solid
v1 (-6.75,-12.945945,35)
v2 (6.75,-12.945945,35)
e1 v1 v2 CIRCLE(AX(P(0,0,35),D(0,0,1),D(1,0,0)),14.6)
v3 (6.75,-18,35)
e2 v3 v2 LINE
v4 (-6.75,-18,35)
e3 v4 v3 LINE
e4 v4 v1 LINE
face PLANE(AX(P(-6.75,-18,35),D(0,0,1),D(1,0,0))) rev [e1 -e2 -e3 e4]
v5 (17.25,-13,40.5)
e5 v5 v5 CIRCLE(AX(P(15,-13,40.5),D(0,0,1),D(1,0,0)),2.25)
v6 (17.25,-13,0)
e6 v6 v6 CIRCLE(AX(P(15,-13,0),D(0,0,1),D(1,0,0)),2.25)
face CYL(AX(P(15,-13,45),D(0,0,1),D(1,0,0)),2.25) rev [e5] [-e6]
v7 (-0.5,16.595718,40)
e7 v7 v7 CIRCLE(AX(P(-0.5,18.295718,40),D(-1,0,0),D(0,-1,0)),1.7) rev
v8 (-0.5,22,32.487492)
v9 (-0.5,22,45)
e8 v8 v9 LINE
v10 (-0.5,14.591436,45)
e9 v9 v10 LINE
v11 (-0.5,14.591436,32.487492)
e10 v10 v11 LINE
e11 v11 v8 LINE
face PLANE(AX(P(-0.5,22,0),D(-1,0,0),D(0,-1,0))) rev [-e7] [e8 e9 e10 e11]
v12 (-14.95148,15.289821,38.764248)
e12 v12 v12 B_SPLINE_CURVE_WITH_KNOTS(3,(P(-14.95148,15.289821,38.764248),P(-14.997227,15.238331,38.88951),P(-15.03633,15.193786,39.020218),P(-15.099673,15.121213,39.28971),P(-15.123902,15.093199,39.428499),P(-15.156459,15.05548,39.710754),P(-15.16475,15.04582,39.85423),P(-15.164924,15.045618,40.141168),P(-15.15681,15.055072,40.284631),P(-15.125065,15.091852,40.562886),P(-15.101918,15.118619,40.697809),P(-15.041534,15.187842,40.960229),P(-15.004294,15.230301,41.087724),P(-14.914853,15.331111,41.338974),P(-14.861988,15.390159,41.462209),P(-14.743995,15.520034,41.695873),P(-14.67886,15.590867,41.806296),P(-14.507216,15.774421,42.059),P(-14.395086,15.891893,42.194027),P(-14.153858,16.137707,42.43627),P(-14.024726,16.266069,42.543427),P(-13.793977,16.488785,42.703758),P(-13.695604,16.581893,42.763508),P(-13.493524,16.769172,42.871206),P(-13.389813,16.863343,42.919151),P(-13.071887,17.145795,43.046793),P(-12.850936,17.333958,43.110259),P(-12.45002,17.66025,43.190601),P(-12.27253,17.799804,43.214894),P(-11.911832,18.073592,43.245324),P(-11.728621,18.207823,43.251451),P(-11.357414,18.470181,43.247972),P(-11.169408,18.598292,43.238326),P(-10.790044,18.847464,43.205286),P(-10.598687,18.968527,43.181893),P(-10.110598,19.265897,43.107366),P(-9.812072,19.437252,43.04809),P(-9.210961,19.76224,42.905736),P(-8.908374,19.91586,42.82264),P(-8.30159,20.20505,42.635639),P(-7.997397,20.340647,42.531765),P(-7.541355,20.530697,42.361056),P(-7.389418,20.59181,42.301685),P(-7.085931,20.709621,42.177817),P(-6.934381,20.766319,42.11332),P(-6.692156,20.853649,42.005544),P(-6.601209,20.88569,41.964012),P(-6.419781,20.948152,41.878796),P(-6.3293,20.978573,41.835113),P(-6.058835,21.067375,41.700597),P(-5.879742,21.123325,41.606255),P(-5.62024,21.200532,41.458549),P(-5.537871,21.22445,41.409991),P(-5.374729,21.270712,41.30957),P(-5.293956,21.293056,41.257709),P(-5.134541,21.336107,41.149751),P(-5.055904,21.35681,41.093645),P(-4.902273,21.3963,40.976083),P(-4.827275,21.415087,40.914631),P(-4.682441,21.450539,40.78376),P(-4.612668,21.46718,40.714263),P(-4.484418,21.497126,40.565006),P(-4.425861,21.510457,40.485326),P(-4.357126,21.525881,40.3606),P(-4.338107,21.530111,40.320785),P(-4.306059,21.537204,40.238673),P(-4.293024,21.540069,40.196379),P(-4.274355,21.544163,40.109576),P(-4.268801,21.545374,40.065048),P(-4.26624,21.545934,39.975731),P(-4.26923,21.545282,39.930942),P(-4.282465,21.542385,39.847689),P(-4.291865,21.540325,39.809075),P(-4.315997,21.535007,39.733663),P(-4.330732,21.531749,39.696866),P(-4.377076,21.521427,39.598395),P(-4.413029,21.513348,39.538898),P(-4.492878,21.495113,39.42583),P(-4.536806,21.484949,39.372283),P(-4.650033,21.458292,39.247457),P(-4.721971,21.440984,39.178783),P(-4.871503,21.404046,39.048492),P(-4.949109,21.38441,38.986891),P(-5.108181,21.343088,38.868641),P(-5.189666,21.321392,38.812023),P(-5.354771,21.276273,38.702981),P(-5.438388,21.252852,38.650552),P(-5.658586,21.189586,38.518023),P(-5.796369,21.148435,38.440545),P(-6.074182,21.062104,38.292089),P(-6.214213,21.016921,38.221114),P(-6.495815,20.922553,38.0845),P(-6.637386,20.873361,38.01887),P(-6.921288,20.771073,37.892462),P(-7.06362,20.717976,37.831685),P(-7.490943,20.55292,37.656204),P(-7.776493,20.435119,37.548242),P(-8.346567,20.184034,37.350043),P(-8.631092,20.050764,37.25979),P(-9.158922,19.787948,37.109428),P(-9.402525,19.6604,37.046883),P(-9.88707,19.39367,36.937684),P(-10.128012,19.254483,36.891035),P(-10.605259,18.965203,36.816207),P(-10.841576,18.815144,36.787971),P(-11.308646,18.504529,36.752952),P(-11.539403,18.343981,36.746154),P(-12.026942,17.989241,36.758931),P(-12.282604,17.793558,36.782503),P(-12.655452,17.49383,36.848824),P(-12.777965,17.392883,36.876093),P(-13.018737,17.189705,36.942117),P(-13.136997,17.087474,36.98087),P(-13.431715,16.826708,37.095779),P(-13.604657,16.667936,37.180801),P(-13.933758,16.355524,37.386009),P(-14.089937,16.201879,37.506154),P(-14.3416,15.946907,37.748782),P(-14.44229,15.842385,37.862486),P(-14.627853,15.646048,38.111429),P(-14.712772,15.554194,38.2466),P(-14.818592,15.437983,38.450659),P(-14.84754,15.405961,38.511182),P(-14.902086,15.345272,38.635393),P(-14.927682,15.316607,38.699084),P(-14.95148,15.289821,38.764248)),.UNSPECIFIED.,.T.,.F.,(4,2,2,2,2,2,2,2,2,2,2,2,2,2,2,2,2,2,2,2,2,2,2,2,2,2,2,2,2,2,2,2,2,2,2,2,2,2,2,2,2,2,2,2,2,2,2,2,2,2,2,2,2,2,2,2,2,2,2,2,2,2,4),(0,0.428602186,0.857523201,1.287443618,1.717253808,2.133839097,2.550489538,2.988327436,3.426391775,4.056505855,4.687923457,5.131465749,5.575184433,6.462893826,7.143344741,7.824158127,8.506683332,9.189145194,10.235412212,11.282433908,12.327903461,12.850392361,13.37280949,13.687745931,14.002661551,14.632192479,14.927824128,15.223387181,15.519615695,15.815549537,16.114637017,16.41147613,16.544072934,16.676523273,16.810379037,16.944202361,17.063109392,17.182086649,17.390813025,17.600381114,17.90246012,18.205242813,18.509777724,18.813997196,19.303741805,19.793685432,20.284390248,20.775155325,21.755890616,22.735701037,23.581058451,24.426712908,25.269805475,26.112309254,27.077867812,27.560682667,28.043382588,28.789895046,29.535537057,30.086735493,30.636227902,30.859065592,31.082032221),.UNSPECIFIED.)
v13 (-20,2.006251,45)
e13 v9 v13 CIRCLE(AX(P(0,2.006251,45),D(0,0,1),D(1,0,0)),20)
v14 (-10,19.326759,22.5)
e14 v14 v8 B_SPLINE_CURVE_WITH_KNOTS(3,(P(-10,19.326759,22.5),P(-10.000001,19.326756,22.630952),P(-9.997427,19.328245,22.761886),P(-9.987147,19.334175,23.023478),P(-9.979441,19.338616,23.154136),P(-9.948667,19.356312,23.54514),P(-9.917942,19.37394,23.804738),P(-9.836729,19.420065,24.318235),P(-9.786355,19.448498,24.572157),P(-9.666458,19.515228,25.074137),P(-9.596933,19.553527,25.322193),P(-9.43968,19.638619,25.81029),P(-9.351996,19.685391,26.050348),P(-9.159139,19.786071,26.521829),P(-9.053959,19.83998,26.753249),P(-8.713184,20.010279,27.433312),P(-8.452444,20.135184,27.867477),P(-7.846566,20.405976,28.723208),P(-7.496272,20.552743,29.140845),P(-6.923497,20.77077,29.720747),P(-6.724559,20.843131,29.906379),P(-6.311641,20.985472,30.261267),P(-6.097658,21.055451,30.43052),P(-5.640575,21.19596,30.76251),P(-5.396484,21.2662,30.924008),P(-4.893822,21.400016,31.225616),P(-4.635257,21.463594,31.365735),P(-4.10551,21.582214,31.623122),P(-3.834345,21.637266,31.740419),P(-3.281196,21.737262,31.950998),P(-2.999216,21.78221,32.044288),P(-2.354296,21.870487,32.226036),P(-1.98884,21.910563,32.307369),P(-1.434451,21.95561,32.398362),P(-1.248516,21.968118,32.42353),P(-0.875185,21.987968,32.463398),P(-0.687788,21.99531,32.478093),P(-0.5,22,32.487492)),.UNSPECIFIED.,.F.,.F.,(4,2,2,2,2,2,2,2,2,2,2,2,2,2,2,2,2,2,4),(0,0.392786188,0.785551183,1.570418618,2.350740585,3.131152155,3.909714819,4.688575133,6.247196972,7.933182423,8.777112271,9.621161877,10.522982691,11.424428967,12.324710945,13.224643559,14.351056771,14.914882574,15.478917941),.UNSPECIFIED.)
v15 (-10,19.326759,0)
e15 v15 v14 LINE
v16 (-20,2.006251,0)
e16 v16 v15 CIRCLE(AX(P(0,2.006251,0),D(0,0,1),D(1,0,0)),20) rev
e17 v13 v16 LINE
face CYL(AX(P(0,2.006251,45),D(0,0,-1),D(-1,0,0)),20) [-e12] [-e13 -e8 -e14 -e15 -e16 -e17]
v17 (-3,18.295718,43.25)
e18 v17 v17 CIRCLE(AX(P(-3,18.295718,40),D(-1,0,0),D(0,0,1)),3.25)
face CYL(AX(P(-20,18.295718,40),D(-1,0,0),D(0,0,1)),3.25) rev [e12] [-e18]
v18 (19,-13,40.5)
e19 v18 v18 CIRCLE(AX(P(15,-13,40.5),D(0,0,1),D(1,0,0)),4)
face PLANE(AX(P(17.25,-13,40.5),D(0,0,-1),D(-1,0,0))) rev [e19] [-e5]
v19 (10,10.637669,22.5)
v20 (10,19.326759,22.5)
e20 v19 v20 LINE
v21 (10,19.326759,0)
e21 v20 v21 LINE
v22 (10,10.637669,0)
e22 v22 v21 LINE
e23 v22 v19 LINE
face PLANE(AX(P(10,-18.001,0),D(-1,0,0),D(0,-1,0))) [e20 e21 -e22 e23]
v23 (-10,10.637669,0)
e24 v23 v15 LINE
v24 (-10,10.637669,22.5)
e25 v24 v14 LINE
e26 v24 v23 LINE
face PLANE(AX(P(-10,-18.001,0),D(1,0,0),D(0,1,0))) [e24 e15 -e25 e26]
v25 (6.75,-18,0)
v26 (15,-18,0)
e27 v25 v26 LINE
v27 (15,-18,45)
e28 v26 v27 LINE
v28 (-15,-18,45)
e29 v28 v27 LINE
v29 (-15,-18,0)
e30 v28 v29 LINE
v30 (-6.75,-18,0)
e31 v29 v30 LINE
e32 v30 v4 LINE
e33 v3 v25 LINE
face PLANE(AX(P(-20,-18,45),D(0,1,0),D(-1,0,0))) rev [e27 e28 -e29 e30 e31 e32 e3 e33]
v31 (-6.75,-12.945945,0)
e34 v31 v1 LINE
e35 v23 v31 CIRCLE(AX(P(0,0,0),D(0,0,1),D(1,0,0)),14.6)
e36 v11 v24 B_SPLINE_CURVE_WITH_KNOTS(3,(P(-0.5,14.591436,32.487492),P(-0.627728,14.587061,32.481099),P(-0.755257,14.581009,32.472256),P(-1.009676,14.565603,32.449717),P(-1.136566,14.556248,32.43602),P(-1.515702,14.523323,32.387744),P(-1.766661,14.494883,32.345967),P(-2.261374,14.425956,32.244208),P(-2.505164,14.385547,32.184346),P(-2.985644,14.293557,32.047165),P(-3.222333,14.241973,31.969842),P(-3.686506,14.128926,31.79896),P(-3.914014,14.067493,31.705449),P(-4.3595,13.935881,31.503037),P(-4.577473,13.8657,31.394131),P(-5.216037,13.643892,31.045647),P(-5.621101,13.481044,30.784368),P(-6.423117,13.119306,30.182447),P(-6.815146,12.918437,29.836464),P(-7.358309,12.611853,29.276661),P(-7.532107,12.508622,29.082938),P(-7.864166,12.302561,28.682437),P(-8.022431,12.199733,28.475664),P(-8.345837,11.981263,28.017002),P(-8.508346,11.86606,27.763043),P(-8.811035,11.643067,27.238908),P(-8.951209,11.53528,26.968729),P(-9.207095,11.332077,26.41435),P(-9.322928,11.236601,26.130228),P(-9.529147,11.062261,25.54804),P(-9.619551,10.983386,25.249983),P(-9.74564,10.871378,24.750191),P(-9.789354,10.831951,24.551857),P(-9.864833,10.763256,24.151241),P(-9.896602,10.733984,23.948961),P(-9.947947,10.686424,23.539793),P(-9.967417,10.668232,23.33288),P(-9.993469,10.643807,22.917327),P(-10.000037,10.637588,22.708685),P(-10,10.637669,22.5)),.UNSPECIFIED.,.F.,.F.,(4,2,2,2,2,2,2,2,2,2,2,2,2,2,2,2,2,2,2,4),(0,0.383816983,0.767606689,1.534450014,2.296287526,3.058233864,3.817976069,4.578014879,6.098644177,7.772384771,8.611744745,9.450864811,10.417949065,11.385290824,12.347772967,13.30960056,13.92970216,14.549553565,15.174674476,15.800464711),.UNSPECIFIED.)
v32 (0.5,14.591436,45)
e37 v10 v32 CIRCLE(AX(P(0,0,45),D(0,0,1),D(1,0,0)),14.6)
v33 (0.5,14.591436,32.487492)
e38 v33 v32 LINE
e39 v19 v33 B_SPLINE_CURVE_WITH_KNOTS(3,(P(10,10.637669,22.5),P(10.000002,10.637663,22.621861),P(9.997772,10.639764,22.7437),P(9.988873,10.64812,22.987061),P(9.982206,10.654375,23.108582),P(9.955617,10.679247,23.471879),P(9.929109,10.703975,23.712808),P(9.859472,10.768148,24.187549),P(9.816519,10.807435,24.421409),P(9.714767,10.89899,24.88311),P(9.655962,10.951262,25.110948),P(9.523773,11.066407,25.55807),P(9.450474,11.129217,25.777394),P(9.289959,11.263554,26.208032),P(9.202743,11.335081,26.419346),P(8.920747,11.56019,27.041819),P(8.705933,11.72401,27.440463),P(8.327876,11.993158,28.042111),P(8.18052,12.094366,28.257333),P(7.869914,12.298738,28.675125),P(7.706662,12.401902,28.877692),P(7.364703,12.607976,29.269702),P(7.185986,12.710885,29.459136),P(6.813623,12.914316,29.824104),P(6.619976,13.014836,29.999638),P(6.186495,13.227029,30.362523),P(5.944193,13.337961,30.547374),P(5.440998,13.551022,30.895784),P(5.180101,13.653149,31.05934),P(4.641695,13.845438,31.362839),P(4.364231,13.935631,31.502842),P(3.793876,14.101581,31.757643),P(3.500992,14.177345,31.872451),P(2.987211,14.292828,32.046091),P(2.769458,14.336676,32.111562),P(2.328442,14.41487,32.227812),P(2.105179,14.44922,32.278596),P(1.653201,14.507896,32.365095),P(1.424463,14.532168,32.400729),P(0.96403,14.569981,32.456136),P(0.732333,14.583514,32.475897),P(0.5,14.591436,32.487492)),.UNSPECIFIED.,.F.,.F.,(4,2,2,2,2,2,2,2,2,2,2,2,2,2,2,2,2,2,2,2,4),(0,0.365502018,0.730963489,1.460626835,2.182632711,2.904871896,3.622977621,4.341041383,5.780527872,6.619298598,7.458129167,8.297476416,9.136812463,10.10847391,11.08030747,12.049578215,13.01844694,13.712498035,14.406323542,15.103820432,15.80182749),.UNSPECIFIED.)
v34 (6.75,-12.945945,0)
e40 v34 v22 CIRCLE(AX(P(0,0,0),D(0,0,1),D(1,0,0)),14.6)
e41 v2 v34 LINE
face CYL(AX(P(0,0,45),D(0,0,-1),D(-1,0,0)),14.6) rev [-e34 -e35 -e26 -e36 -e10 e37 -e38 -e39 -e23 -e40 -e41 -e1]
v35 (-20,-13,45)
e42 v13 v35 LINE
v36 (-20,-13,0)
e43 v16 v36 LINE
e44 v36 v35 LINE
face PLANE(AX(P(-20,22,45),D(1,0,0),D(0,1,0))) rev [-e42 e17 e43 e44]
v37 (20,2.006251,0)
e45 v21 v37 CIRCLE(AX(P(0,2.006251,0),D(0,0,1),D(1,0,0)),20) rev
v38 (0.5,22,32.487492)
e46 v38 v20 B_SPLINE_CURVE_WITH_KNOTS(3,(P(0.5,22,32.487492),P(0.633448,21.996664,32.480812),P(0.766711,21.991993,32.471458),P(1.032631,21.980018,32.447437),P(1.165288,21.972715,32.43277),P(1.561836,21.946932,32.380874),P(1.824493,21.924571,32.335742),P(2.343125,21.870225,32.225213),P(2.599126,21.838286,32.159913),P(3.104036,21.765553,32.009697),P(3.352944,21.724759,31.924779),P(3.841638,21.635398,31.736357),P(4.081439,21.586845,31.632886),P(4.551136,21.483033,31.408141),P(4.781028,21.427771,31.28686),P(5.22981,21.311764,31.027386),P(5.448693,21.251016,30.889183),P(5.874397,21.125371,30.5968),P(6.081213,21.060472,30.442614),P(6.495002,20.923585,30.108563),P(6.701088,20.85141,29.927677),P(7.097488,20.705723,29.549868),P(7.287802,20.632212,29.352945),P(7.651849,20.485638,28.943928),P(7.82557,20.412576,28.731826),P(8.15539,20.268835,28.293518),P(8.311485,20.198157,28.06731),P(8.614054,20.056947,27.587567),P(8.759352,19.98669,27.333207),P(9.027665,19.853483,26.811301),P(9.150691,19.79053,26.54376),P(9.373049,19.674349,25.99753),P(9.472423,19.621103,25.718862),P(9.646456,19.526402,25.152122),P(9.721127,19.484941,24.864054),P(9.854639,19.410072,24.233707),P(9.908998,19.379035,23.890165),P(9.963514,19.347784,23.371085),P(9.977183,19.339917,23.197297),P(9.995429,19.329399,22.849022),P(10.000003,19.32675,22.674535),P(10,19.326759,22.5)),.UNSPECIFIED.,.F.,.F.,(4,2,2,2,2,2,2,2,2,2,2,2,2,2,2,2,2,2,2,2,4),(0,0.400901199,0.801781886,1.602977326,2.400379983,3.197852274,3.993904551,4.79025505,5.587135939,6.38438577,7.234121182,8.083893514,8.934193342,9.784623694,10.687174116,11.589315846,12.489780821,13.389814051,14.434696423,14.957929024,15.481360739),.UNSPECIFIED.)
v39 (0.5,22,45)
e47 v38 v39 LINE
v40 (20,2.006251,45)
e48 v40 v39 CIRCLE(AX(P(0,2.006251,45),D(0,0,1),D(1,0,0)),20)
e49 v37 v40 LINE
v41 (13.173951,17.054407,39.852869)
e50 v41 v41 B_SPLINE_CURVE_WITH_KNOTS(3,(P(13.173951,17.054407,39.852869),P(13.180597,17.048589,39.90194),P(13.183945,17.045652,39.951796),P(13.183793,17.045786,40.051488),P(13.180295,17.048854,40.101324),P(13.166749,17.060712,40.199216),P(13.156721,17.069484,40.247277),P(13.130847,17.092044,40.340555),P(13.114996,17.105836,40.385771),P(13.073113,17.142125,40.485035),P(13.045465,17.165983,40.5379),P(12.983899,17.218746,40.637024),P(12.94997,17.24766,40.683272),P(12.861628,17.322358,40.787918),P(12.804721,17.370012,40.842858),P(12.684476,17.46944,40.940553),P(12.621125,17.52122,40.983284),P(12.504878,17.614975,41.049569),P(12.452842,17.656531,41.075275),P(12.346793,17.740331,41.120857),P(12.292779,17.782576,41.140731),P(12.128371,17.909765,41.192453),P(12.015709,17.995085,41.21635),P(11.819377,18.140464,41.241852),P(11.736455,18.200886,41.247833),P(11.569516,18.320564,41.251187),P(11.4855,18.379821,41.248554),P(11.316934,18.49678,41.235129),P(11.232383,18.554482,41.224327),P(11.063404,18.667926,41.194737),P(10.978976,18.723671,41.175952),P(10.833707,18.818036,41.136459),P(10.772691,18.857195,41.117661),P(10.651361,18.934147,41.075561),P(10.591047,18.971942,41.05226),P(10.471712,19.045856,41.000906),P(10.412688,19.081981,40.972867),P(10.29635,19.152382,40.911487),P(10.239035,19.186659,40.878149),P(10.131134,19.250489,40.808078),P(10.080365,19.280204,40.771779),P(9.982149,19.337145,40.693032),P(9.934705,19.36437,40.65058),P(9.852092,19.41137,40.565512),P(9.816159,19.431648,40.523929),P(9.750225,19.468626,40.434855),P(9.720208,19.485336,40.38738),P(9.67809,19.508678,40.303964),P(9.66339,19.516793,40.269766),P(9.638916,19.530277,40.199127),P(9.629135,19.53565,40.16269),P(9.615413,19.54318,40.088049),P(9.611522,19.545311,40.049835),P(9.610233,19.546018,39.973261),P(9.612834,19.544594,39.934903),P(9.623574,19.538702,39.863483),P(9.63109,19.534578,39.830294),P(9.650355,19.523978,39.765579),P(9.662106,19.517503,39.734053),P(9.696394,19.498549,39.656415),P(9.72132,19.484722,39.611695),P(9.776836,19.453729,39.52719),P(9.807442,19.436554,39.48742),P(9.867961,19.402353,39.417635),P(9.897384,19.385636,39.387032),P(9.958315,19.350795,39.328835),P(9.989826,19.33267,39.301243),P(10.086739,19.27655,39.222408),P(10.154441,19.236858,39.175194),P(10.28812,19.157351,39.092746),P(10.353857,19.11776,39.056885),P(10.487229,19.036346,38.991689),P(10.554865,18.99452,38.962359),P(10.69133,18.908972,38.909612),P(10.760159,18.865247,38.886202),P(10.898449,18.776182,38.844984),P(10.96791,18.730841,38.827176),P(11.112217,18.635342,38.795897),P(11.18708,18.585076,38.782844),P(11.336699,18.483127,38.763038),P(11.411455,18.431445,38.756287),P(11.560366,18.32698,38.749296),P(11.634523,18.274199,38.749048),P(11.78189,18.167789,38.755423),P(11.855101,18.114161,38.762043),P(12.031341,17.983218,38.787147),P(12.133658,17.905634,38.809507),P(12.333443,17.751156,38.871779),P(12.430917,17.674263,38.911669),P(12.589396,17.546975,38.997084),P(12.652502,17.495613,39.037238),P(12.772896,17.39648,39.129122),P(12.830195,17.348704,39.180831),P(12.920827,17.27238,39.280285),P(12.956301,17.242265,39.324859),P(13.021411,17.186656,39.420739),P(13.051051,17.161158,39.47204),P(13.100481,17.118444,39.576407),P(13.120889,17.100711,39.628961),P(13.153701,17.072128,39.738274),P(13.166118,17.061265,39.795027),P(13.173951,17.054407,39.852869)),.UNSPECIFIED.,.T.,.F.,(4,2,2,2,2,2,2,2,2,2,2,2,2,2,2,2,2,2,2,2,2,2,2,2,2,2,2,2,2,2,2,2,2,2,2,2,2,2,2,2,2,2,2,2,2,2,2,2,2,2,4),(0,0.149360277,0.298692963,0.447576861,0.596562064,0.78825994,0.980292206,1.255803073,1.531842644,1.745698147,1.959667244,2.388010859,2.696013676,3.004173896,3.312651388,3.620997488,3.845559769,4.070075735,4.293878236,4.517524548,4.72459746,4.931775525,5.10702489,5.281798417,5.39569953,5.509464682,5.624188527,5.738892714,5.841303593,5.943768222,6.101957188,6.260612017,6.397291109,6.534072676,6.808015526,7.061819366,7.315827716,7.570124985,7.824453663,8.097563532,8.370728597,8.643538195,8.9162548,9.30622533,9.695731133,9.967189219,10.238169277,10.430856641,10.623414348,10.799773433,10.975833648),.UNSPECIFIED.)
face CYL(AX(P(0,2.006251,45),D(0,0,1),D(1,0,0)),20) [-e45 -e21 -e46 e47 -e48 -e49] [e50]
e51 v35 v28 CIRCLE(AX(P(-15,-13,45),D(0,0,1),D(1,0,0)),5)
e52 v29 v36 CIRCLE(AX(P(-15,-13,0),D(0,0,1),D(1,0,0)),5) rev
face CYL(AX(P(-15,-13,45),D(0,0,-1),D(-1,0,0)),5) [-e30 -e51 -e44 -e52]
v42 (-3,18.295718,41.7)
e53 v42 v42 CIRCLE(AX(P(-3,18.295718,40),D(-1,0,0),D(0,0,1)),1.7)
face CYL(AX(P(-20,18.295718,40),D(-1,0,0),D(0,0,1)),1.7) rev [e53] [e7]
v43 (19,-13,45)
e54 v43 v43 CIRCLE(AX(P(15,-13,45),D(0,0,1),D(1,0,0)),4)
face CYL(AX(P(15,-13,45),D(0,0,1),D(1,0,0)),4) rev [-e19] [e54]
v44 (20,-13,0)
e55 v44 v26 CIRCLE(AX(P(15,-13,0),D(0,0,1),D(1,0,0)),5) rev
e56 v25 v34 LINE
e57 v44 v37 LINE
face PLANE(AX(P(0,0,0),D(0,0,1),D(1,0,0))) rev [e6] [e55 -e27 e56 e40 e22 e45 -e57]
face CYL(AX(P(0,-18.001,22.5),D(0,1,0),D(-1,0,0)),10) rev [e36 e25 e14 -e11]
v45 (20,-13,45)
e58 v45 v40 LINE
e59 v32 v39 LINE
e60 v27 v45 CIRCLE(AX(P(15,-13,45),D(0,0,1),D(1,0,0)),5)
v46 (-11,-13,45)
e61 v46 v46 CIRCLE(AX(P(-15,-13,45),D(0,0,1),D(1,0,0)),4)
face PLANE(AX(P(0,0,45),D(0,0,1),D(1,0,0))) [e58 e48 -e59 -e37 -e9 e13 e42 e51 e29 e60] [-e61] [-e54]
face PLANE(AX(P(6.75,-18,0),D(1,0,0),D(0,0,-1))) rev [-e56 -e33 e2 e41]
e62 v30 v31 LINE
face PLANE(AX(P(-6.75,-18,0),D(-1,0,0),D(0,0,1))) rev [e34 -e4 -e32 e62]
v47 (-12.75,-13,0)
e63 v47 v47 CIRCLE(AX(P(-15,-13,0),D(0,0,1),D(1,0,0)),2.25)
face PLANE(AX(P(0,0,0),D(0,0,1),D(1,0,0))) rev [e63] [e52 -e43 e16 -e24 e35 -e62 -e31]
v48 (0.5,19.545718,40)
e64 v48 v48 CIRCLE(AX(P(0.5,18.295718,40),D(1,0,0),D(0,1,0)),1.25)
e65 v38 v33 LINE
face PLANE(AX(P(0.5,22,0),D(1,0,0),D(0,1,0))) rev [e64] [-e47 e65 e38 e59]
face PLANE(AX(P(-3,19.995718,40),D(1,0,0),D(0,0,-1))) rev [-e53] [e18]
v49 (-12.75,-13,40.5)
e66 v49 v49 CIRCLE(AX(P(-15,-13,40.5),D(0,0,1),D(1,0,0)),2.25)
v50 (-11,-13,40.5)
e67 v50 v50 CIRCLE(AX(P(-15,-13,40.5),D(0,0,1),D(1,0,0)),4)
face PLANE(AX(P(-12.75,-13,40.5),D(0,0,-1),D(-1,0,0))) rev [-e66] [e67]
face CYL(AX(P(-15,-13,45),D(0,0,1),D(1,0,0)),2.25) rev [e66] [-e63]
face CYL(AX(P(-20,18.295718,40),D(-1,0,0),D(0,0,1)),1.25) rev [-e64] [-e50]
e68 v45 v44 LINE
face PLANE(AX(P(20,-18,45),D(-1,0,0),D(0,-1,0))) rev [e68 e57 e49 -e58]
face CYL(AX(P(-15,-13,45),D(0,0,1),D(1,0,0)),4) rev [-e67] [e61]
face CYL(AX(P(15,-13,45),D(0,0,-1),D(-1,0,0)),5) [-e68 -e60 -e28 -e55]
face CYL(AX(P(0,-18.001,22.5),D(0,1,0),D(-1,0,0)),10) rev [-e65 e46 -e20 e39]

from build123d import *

# Parameters (mm, degrees)
SKETCH_1_W                     = 40
SKETCH_1_H                     = 40
SKETCH_1_R                     = 14.6
EXTRUDE_1_DEPTH                = 45
SKETCH_6_W                     = 1
SKETCH_6_H                     = 22
CUT_EXTRUDE_1_DEPTH            = 54.935146241
M3X0_5_1_D                     = 2.5
HOLE_START                     = -21
HOLE_WIZARD_M3_2_OUTLINE_R     = 3.25
HOLE_WIZARD_M3_2_OUTLINE_R_2   = 1.25
HOLE_WIZARD_M3_2_DEPTH         = 18
HOLE_START_2                   = -3
HOLE_WIZARD_M3_2_2_OUTLINE_R   = 1.7
HOLE_WIZARD_M3_2_2_OUTLINE_R_2 = 1.25
HOLE_WIZARD_M3_2_2_DEPTH       = 2.5
HOLE_WIZARD_M4_1_D             = 4.5
HOLE_WIZARD_M4_1_CBORE_D       = 8
HOLE_WIZARD_M4_1_CBORE_DEPTH   = 4.5
CUT_EXTRUDE_2_REACH            = 65.443
CUT_EXTRUDE_2_END_RADIUS       = 14.6
SKETCH_10_W                    = 13.5
SKETCH_10_H                    = 35
CUT_EXTRUDE_3_DEPTH            = 54.935146365
FILLET_3_DEPTH                 = 45
FILLET_4_R                     = 5


with BuildPart() as part:
    # 草圖1 → 填料-伸長1 (new body)
    with BuildSketch(Plane.XY):
        with Locations((0, 2)):
            Rectangle(SKETCH_1_W, SKETCH_1_H)
        with Locations(Location((0, 0, 0), (0, 0, 180))):
            Circle(SKETCH_1_R, mode=Mode.SUBTRACT)
    extrude(amount=EXTRUDE_1_DEPTH)

    # 草圖6 → 除料-伸長1 (cut, through all)
    with BuildSketch(Plane.XY.offset(45)):
        with Locations((0, 11)):
            Rectangle(SKETCH_6_W, SKETCH_6_H)
    extrude(amount=-CUT_EXTRUDE_1_DEPTH, mode=Mode.SUBTRACT)

    # M3x0.5 螺紋孔1 (through all)
    with Locations(Plane.ZY.offset(20)):
        with Locations((40, 18.295717922)):
            Hole(M3X0_5_1_D / 2)

    # M3 凹頭蓋螺釘的柱孔2: read off the stored shape, not the designer's step
    # M3 凹頭蓋螺釘的柱孔2 outline → M3 凹頭蓋螺釘的柱孔2 (cut)
    with BuildSketch(Plane.YZ.offset(HOLE_START)):
        with Locations((18.295717922, 40)):
            Circle(HOLE_WIZARD_M3_2_OUTLINE_R)
        with Locations((18.295717922, 40)):
            Circle(HOLE_WIZARD_M3_2_OUTLINE_R_2, mode=Mode.SUBTRACT)
    extrude(amount=HOLE_WIZARD_M3_2_DEPTH, mode=Mode.SUBTRACT)

    # Hole Wizard M3 _2 2 outline → Hole Wizard M3 _2 2 (cut)
    with BuildSketch(Plane.YZ.offset(HOLE_START_2)):
        with Locations((18.295717922, 40)):
            Circle(HOLE_WIZARD_M3_2_2_OUTLINE_R)
        with Locations((18.295717922, 40)):
            Circle(HOLE_WIZARD_M3_2_2_OUTLINE_R_2, mode=Mode.SUBTRACT)
    extrude(amount=HOLE_WIZARD_M3_2_2_DEPTH, mode=Mode.SUBTRACT)

    # M4 凹頭蓋螺釘的柱孔1 (through all)
    with Locations(Plane.XY.offset(45)):
        with Locations((15, -13), (-15, -13)):
            CounterBoreHole(HOLE_WIZARD_M4_1_D / 2, HOLE_WIZARD_M4_1_CBORE_D / 2, HOLE_WIZARD_M4_1_CBORE_DEPTH)

    # 除料-伸長2: up to this cylinder (the profile starts outside it)
    cut_extrude_2_end = Plane(origin=(0, 0, 15.25905), z_dir=(0, 0, -1)) * Cylinder(CUT_EXTRUDE_2_END_RADIUS, 161.086, mode=Mode.PRIVATE)
    # 草圖9 → 除料-伸長2 (cut, up to the surface)
    with BuildSketch(Plane.XZ.offset(-22), mode=Mode.PRIVATE) as cut_extrude_2_sk1:
        with BuildLine():
            Line((-10, 0), (10, 0))
            Line((10, 0), (10, 22.5))
            ThreePointArc((10, 22.5), (0, 32.5), (-10, 22.5))
            Line((-10, 22.5), (-10, 0))
        make_face()
    cut_extrude_2_tool1 = extrude(cut_extrude_2_sk1.sketch, amount=CUT_EXTRUDE_2_REACH, mode=Mode.PRIVATE) - cut_extrude_2_end
    add(cut_extrude_2_tool1.solids().sort_by_distance((0, 22, 15.25905))[0], mode=Mode.SUBTRACT)

    # 草圖10 → 除料-伸長3 (cut, through all)
    with BuildSketch(Plane(origin=(0, 0, 0), x_dir=(1, 0, 0), z_dir=(0, 1, 0))):
        with Locations((0, -17.5)):
            Rectangle(SKETCH_10_W, SKETCH_10_H)
    extrude(amount=-CUT_EXTRUDE_3_DEPTH, mode=Mode.SUBTRACT)

    # 圓角3: read off the stored shape, not the designer's step
    # 圓角3 outline → 圓角3 (cut)
    with BuildSketch(Plane.XY):
        with BuildLine():
            Line((20, 2.006250977), (20, 22))
            Line((20, 22), (0.5, 22))
            ThreePointArc((0.5, 22), (14.317821063, 15.970491021), (20, 2.006250977))
        make_face()
        with BuildLine():
            Line((-20, 22), (-20, 2.006250977))
            ThreePointArc((-20, 2.006250977), (-14.317821063, 15.970491021), (-0.5, 22))
            Line((-0.5, 22), (-20, 22))
        make_face()
    extrude(amount=FILLET_3_DEPTH, mode=Mode.SUBTRACT)

    # 圓角4
    fillet_4_edges = [part.edges().sort_by_distance(p)[0] for p in [
        (20, -18, 22.5),
        (-20, -18, 22.5),
    ]]
    fillet(fillet_4_edges, radius=FILLET_4_R)


solid = part.part
